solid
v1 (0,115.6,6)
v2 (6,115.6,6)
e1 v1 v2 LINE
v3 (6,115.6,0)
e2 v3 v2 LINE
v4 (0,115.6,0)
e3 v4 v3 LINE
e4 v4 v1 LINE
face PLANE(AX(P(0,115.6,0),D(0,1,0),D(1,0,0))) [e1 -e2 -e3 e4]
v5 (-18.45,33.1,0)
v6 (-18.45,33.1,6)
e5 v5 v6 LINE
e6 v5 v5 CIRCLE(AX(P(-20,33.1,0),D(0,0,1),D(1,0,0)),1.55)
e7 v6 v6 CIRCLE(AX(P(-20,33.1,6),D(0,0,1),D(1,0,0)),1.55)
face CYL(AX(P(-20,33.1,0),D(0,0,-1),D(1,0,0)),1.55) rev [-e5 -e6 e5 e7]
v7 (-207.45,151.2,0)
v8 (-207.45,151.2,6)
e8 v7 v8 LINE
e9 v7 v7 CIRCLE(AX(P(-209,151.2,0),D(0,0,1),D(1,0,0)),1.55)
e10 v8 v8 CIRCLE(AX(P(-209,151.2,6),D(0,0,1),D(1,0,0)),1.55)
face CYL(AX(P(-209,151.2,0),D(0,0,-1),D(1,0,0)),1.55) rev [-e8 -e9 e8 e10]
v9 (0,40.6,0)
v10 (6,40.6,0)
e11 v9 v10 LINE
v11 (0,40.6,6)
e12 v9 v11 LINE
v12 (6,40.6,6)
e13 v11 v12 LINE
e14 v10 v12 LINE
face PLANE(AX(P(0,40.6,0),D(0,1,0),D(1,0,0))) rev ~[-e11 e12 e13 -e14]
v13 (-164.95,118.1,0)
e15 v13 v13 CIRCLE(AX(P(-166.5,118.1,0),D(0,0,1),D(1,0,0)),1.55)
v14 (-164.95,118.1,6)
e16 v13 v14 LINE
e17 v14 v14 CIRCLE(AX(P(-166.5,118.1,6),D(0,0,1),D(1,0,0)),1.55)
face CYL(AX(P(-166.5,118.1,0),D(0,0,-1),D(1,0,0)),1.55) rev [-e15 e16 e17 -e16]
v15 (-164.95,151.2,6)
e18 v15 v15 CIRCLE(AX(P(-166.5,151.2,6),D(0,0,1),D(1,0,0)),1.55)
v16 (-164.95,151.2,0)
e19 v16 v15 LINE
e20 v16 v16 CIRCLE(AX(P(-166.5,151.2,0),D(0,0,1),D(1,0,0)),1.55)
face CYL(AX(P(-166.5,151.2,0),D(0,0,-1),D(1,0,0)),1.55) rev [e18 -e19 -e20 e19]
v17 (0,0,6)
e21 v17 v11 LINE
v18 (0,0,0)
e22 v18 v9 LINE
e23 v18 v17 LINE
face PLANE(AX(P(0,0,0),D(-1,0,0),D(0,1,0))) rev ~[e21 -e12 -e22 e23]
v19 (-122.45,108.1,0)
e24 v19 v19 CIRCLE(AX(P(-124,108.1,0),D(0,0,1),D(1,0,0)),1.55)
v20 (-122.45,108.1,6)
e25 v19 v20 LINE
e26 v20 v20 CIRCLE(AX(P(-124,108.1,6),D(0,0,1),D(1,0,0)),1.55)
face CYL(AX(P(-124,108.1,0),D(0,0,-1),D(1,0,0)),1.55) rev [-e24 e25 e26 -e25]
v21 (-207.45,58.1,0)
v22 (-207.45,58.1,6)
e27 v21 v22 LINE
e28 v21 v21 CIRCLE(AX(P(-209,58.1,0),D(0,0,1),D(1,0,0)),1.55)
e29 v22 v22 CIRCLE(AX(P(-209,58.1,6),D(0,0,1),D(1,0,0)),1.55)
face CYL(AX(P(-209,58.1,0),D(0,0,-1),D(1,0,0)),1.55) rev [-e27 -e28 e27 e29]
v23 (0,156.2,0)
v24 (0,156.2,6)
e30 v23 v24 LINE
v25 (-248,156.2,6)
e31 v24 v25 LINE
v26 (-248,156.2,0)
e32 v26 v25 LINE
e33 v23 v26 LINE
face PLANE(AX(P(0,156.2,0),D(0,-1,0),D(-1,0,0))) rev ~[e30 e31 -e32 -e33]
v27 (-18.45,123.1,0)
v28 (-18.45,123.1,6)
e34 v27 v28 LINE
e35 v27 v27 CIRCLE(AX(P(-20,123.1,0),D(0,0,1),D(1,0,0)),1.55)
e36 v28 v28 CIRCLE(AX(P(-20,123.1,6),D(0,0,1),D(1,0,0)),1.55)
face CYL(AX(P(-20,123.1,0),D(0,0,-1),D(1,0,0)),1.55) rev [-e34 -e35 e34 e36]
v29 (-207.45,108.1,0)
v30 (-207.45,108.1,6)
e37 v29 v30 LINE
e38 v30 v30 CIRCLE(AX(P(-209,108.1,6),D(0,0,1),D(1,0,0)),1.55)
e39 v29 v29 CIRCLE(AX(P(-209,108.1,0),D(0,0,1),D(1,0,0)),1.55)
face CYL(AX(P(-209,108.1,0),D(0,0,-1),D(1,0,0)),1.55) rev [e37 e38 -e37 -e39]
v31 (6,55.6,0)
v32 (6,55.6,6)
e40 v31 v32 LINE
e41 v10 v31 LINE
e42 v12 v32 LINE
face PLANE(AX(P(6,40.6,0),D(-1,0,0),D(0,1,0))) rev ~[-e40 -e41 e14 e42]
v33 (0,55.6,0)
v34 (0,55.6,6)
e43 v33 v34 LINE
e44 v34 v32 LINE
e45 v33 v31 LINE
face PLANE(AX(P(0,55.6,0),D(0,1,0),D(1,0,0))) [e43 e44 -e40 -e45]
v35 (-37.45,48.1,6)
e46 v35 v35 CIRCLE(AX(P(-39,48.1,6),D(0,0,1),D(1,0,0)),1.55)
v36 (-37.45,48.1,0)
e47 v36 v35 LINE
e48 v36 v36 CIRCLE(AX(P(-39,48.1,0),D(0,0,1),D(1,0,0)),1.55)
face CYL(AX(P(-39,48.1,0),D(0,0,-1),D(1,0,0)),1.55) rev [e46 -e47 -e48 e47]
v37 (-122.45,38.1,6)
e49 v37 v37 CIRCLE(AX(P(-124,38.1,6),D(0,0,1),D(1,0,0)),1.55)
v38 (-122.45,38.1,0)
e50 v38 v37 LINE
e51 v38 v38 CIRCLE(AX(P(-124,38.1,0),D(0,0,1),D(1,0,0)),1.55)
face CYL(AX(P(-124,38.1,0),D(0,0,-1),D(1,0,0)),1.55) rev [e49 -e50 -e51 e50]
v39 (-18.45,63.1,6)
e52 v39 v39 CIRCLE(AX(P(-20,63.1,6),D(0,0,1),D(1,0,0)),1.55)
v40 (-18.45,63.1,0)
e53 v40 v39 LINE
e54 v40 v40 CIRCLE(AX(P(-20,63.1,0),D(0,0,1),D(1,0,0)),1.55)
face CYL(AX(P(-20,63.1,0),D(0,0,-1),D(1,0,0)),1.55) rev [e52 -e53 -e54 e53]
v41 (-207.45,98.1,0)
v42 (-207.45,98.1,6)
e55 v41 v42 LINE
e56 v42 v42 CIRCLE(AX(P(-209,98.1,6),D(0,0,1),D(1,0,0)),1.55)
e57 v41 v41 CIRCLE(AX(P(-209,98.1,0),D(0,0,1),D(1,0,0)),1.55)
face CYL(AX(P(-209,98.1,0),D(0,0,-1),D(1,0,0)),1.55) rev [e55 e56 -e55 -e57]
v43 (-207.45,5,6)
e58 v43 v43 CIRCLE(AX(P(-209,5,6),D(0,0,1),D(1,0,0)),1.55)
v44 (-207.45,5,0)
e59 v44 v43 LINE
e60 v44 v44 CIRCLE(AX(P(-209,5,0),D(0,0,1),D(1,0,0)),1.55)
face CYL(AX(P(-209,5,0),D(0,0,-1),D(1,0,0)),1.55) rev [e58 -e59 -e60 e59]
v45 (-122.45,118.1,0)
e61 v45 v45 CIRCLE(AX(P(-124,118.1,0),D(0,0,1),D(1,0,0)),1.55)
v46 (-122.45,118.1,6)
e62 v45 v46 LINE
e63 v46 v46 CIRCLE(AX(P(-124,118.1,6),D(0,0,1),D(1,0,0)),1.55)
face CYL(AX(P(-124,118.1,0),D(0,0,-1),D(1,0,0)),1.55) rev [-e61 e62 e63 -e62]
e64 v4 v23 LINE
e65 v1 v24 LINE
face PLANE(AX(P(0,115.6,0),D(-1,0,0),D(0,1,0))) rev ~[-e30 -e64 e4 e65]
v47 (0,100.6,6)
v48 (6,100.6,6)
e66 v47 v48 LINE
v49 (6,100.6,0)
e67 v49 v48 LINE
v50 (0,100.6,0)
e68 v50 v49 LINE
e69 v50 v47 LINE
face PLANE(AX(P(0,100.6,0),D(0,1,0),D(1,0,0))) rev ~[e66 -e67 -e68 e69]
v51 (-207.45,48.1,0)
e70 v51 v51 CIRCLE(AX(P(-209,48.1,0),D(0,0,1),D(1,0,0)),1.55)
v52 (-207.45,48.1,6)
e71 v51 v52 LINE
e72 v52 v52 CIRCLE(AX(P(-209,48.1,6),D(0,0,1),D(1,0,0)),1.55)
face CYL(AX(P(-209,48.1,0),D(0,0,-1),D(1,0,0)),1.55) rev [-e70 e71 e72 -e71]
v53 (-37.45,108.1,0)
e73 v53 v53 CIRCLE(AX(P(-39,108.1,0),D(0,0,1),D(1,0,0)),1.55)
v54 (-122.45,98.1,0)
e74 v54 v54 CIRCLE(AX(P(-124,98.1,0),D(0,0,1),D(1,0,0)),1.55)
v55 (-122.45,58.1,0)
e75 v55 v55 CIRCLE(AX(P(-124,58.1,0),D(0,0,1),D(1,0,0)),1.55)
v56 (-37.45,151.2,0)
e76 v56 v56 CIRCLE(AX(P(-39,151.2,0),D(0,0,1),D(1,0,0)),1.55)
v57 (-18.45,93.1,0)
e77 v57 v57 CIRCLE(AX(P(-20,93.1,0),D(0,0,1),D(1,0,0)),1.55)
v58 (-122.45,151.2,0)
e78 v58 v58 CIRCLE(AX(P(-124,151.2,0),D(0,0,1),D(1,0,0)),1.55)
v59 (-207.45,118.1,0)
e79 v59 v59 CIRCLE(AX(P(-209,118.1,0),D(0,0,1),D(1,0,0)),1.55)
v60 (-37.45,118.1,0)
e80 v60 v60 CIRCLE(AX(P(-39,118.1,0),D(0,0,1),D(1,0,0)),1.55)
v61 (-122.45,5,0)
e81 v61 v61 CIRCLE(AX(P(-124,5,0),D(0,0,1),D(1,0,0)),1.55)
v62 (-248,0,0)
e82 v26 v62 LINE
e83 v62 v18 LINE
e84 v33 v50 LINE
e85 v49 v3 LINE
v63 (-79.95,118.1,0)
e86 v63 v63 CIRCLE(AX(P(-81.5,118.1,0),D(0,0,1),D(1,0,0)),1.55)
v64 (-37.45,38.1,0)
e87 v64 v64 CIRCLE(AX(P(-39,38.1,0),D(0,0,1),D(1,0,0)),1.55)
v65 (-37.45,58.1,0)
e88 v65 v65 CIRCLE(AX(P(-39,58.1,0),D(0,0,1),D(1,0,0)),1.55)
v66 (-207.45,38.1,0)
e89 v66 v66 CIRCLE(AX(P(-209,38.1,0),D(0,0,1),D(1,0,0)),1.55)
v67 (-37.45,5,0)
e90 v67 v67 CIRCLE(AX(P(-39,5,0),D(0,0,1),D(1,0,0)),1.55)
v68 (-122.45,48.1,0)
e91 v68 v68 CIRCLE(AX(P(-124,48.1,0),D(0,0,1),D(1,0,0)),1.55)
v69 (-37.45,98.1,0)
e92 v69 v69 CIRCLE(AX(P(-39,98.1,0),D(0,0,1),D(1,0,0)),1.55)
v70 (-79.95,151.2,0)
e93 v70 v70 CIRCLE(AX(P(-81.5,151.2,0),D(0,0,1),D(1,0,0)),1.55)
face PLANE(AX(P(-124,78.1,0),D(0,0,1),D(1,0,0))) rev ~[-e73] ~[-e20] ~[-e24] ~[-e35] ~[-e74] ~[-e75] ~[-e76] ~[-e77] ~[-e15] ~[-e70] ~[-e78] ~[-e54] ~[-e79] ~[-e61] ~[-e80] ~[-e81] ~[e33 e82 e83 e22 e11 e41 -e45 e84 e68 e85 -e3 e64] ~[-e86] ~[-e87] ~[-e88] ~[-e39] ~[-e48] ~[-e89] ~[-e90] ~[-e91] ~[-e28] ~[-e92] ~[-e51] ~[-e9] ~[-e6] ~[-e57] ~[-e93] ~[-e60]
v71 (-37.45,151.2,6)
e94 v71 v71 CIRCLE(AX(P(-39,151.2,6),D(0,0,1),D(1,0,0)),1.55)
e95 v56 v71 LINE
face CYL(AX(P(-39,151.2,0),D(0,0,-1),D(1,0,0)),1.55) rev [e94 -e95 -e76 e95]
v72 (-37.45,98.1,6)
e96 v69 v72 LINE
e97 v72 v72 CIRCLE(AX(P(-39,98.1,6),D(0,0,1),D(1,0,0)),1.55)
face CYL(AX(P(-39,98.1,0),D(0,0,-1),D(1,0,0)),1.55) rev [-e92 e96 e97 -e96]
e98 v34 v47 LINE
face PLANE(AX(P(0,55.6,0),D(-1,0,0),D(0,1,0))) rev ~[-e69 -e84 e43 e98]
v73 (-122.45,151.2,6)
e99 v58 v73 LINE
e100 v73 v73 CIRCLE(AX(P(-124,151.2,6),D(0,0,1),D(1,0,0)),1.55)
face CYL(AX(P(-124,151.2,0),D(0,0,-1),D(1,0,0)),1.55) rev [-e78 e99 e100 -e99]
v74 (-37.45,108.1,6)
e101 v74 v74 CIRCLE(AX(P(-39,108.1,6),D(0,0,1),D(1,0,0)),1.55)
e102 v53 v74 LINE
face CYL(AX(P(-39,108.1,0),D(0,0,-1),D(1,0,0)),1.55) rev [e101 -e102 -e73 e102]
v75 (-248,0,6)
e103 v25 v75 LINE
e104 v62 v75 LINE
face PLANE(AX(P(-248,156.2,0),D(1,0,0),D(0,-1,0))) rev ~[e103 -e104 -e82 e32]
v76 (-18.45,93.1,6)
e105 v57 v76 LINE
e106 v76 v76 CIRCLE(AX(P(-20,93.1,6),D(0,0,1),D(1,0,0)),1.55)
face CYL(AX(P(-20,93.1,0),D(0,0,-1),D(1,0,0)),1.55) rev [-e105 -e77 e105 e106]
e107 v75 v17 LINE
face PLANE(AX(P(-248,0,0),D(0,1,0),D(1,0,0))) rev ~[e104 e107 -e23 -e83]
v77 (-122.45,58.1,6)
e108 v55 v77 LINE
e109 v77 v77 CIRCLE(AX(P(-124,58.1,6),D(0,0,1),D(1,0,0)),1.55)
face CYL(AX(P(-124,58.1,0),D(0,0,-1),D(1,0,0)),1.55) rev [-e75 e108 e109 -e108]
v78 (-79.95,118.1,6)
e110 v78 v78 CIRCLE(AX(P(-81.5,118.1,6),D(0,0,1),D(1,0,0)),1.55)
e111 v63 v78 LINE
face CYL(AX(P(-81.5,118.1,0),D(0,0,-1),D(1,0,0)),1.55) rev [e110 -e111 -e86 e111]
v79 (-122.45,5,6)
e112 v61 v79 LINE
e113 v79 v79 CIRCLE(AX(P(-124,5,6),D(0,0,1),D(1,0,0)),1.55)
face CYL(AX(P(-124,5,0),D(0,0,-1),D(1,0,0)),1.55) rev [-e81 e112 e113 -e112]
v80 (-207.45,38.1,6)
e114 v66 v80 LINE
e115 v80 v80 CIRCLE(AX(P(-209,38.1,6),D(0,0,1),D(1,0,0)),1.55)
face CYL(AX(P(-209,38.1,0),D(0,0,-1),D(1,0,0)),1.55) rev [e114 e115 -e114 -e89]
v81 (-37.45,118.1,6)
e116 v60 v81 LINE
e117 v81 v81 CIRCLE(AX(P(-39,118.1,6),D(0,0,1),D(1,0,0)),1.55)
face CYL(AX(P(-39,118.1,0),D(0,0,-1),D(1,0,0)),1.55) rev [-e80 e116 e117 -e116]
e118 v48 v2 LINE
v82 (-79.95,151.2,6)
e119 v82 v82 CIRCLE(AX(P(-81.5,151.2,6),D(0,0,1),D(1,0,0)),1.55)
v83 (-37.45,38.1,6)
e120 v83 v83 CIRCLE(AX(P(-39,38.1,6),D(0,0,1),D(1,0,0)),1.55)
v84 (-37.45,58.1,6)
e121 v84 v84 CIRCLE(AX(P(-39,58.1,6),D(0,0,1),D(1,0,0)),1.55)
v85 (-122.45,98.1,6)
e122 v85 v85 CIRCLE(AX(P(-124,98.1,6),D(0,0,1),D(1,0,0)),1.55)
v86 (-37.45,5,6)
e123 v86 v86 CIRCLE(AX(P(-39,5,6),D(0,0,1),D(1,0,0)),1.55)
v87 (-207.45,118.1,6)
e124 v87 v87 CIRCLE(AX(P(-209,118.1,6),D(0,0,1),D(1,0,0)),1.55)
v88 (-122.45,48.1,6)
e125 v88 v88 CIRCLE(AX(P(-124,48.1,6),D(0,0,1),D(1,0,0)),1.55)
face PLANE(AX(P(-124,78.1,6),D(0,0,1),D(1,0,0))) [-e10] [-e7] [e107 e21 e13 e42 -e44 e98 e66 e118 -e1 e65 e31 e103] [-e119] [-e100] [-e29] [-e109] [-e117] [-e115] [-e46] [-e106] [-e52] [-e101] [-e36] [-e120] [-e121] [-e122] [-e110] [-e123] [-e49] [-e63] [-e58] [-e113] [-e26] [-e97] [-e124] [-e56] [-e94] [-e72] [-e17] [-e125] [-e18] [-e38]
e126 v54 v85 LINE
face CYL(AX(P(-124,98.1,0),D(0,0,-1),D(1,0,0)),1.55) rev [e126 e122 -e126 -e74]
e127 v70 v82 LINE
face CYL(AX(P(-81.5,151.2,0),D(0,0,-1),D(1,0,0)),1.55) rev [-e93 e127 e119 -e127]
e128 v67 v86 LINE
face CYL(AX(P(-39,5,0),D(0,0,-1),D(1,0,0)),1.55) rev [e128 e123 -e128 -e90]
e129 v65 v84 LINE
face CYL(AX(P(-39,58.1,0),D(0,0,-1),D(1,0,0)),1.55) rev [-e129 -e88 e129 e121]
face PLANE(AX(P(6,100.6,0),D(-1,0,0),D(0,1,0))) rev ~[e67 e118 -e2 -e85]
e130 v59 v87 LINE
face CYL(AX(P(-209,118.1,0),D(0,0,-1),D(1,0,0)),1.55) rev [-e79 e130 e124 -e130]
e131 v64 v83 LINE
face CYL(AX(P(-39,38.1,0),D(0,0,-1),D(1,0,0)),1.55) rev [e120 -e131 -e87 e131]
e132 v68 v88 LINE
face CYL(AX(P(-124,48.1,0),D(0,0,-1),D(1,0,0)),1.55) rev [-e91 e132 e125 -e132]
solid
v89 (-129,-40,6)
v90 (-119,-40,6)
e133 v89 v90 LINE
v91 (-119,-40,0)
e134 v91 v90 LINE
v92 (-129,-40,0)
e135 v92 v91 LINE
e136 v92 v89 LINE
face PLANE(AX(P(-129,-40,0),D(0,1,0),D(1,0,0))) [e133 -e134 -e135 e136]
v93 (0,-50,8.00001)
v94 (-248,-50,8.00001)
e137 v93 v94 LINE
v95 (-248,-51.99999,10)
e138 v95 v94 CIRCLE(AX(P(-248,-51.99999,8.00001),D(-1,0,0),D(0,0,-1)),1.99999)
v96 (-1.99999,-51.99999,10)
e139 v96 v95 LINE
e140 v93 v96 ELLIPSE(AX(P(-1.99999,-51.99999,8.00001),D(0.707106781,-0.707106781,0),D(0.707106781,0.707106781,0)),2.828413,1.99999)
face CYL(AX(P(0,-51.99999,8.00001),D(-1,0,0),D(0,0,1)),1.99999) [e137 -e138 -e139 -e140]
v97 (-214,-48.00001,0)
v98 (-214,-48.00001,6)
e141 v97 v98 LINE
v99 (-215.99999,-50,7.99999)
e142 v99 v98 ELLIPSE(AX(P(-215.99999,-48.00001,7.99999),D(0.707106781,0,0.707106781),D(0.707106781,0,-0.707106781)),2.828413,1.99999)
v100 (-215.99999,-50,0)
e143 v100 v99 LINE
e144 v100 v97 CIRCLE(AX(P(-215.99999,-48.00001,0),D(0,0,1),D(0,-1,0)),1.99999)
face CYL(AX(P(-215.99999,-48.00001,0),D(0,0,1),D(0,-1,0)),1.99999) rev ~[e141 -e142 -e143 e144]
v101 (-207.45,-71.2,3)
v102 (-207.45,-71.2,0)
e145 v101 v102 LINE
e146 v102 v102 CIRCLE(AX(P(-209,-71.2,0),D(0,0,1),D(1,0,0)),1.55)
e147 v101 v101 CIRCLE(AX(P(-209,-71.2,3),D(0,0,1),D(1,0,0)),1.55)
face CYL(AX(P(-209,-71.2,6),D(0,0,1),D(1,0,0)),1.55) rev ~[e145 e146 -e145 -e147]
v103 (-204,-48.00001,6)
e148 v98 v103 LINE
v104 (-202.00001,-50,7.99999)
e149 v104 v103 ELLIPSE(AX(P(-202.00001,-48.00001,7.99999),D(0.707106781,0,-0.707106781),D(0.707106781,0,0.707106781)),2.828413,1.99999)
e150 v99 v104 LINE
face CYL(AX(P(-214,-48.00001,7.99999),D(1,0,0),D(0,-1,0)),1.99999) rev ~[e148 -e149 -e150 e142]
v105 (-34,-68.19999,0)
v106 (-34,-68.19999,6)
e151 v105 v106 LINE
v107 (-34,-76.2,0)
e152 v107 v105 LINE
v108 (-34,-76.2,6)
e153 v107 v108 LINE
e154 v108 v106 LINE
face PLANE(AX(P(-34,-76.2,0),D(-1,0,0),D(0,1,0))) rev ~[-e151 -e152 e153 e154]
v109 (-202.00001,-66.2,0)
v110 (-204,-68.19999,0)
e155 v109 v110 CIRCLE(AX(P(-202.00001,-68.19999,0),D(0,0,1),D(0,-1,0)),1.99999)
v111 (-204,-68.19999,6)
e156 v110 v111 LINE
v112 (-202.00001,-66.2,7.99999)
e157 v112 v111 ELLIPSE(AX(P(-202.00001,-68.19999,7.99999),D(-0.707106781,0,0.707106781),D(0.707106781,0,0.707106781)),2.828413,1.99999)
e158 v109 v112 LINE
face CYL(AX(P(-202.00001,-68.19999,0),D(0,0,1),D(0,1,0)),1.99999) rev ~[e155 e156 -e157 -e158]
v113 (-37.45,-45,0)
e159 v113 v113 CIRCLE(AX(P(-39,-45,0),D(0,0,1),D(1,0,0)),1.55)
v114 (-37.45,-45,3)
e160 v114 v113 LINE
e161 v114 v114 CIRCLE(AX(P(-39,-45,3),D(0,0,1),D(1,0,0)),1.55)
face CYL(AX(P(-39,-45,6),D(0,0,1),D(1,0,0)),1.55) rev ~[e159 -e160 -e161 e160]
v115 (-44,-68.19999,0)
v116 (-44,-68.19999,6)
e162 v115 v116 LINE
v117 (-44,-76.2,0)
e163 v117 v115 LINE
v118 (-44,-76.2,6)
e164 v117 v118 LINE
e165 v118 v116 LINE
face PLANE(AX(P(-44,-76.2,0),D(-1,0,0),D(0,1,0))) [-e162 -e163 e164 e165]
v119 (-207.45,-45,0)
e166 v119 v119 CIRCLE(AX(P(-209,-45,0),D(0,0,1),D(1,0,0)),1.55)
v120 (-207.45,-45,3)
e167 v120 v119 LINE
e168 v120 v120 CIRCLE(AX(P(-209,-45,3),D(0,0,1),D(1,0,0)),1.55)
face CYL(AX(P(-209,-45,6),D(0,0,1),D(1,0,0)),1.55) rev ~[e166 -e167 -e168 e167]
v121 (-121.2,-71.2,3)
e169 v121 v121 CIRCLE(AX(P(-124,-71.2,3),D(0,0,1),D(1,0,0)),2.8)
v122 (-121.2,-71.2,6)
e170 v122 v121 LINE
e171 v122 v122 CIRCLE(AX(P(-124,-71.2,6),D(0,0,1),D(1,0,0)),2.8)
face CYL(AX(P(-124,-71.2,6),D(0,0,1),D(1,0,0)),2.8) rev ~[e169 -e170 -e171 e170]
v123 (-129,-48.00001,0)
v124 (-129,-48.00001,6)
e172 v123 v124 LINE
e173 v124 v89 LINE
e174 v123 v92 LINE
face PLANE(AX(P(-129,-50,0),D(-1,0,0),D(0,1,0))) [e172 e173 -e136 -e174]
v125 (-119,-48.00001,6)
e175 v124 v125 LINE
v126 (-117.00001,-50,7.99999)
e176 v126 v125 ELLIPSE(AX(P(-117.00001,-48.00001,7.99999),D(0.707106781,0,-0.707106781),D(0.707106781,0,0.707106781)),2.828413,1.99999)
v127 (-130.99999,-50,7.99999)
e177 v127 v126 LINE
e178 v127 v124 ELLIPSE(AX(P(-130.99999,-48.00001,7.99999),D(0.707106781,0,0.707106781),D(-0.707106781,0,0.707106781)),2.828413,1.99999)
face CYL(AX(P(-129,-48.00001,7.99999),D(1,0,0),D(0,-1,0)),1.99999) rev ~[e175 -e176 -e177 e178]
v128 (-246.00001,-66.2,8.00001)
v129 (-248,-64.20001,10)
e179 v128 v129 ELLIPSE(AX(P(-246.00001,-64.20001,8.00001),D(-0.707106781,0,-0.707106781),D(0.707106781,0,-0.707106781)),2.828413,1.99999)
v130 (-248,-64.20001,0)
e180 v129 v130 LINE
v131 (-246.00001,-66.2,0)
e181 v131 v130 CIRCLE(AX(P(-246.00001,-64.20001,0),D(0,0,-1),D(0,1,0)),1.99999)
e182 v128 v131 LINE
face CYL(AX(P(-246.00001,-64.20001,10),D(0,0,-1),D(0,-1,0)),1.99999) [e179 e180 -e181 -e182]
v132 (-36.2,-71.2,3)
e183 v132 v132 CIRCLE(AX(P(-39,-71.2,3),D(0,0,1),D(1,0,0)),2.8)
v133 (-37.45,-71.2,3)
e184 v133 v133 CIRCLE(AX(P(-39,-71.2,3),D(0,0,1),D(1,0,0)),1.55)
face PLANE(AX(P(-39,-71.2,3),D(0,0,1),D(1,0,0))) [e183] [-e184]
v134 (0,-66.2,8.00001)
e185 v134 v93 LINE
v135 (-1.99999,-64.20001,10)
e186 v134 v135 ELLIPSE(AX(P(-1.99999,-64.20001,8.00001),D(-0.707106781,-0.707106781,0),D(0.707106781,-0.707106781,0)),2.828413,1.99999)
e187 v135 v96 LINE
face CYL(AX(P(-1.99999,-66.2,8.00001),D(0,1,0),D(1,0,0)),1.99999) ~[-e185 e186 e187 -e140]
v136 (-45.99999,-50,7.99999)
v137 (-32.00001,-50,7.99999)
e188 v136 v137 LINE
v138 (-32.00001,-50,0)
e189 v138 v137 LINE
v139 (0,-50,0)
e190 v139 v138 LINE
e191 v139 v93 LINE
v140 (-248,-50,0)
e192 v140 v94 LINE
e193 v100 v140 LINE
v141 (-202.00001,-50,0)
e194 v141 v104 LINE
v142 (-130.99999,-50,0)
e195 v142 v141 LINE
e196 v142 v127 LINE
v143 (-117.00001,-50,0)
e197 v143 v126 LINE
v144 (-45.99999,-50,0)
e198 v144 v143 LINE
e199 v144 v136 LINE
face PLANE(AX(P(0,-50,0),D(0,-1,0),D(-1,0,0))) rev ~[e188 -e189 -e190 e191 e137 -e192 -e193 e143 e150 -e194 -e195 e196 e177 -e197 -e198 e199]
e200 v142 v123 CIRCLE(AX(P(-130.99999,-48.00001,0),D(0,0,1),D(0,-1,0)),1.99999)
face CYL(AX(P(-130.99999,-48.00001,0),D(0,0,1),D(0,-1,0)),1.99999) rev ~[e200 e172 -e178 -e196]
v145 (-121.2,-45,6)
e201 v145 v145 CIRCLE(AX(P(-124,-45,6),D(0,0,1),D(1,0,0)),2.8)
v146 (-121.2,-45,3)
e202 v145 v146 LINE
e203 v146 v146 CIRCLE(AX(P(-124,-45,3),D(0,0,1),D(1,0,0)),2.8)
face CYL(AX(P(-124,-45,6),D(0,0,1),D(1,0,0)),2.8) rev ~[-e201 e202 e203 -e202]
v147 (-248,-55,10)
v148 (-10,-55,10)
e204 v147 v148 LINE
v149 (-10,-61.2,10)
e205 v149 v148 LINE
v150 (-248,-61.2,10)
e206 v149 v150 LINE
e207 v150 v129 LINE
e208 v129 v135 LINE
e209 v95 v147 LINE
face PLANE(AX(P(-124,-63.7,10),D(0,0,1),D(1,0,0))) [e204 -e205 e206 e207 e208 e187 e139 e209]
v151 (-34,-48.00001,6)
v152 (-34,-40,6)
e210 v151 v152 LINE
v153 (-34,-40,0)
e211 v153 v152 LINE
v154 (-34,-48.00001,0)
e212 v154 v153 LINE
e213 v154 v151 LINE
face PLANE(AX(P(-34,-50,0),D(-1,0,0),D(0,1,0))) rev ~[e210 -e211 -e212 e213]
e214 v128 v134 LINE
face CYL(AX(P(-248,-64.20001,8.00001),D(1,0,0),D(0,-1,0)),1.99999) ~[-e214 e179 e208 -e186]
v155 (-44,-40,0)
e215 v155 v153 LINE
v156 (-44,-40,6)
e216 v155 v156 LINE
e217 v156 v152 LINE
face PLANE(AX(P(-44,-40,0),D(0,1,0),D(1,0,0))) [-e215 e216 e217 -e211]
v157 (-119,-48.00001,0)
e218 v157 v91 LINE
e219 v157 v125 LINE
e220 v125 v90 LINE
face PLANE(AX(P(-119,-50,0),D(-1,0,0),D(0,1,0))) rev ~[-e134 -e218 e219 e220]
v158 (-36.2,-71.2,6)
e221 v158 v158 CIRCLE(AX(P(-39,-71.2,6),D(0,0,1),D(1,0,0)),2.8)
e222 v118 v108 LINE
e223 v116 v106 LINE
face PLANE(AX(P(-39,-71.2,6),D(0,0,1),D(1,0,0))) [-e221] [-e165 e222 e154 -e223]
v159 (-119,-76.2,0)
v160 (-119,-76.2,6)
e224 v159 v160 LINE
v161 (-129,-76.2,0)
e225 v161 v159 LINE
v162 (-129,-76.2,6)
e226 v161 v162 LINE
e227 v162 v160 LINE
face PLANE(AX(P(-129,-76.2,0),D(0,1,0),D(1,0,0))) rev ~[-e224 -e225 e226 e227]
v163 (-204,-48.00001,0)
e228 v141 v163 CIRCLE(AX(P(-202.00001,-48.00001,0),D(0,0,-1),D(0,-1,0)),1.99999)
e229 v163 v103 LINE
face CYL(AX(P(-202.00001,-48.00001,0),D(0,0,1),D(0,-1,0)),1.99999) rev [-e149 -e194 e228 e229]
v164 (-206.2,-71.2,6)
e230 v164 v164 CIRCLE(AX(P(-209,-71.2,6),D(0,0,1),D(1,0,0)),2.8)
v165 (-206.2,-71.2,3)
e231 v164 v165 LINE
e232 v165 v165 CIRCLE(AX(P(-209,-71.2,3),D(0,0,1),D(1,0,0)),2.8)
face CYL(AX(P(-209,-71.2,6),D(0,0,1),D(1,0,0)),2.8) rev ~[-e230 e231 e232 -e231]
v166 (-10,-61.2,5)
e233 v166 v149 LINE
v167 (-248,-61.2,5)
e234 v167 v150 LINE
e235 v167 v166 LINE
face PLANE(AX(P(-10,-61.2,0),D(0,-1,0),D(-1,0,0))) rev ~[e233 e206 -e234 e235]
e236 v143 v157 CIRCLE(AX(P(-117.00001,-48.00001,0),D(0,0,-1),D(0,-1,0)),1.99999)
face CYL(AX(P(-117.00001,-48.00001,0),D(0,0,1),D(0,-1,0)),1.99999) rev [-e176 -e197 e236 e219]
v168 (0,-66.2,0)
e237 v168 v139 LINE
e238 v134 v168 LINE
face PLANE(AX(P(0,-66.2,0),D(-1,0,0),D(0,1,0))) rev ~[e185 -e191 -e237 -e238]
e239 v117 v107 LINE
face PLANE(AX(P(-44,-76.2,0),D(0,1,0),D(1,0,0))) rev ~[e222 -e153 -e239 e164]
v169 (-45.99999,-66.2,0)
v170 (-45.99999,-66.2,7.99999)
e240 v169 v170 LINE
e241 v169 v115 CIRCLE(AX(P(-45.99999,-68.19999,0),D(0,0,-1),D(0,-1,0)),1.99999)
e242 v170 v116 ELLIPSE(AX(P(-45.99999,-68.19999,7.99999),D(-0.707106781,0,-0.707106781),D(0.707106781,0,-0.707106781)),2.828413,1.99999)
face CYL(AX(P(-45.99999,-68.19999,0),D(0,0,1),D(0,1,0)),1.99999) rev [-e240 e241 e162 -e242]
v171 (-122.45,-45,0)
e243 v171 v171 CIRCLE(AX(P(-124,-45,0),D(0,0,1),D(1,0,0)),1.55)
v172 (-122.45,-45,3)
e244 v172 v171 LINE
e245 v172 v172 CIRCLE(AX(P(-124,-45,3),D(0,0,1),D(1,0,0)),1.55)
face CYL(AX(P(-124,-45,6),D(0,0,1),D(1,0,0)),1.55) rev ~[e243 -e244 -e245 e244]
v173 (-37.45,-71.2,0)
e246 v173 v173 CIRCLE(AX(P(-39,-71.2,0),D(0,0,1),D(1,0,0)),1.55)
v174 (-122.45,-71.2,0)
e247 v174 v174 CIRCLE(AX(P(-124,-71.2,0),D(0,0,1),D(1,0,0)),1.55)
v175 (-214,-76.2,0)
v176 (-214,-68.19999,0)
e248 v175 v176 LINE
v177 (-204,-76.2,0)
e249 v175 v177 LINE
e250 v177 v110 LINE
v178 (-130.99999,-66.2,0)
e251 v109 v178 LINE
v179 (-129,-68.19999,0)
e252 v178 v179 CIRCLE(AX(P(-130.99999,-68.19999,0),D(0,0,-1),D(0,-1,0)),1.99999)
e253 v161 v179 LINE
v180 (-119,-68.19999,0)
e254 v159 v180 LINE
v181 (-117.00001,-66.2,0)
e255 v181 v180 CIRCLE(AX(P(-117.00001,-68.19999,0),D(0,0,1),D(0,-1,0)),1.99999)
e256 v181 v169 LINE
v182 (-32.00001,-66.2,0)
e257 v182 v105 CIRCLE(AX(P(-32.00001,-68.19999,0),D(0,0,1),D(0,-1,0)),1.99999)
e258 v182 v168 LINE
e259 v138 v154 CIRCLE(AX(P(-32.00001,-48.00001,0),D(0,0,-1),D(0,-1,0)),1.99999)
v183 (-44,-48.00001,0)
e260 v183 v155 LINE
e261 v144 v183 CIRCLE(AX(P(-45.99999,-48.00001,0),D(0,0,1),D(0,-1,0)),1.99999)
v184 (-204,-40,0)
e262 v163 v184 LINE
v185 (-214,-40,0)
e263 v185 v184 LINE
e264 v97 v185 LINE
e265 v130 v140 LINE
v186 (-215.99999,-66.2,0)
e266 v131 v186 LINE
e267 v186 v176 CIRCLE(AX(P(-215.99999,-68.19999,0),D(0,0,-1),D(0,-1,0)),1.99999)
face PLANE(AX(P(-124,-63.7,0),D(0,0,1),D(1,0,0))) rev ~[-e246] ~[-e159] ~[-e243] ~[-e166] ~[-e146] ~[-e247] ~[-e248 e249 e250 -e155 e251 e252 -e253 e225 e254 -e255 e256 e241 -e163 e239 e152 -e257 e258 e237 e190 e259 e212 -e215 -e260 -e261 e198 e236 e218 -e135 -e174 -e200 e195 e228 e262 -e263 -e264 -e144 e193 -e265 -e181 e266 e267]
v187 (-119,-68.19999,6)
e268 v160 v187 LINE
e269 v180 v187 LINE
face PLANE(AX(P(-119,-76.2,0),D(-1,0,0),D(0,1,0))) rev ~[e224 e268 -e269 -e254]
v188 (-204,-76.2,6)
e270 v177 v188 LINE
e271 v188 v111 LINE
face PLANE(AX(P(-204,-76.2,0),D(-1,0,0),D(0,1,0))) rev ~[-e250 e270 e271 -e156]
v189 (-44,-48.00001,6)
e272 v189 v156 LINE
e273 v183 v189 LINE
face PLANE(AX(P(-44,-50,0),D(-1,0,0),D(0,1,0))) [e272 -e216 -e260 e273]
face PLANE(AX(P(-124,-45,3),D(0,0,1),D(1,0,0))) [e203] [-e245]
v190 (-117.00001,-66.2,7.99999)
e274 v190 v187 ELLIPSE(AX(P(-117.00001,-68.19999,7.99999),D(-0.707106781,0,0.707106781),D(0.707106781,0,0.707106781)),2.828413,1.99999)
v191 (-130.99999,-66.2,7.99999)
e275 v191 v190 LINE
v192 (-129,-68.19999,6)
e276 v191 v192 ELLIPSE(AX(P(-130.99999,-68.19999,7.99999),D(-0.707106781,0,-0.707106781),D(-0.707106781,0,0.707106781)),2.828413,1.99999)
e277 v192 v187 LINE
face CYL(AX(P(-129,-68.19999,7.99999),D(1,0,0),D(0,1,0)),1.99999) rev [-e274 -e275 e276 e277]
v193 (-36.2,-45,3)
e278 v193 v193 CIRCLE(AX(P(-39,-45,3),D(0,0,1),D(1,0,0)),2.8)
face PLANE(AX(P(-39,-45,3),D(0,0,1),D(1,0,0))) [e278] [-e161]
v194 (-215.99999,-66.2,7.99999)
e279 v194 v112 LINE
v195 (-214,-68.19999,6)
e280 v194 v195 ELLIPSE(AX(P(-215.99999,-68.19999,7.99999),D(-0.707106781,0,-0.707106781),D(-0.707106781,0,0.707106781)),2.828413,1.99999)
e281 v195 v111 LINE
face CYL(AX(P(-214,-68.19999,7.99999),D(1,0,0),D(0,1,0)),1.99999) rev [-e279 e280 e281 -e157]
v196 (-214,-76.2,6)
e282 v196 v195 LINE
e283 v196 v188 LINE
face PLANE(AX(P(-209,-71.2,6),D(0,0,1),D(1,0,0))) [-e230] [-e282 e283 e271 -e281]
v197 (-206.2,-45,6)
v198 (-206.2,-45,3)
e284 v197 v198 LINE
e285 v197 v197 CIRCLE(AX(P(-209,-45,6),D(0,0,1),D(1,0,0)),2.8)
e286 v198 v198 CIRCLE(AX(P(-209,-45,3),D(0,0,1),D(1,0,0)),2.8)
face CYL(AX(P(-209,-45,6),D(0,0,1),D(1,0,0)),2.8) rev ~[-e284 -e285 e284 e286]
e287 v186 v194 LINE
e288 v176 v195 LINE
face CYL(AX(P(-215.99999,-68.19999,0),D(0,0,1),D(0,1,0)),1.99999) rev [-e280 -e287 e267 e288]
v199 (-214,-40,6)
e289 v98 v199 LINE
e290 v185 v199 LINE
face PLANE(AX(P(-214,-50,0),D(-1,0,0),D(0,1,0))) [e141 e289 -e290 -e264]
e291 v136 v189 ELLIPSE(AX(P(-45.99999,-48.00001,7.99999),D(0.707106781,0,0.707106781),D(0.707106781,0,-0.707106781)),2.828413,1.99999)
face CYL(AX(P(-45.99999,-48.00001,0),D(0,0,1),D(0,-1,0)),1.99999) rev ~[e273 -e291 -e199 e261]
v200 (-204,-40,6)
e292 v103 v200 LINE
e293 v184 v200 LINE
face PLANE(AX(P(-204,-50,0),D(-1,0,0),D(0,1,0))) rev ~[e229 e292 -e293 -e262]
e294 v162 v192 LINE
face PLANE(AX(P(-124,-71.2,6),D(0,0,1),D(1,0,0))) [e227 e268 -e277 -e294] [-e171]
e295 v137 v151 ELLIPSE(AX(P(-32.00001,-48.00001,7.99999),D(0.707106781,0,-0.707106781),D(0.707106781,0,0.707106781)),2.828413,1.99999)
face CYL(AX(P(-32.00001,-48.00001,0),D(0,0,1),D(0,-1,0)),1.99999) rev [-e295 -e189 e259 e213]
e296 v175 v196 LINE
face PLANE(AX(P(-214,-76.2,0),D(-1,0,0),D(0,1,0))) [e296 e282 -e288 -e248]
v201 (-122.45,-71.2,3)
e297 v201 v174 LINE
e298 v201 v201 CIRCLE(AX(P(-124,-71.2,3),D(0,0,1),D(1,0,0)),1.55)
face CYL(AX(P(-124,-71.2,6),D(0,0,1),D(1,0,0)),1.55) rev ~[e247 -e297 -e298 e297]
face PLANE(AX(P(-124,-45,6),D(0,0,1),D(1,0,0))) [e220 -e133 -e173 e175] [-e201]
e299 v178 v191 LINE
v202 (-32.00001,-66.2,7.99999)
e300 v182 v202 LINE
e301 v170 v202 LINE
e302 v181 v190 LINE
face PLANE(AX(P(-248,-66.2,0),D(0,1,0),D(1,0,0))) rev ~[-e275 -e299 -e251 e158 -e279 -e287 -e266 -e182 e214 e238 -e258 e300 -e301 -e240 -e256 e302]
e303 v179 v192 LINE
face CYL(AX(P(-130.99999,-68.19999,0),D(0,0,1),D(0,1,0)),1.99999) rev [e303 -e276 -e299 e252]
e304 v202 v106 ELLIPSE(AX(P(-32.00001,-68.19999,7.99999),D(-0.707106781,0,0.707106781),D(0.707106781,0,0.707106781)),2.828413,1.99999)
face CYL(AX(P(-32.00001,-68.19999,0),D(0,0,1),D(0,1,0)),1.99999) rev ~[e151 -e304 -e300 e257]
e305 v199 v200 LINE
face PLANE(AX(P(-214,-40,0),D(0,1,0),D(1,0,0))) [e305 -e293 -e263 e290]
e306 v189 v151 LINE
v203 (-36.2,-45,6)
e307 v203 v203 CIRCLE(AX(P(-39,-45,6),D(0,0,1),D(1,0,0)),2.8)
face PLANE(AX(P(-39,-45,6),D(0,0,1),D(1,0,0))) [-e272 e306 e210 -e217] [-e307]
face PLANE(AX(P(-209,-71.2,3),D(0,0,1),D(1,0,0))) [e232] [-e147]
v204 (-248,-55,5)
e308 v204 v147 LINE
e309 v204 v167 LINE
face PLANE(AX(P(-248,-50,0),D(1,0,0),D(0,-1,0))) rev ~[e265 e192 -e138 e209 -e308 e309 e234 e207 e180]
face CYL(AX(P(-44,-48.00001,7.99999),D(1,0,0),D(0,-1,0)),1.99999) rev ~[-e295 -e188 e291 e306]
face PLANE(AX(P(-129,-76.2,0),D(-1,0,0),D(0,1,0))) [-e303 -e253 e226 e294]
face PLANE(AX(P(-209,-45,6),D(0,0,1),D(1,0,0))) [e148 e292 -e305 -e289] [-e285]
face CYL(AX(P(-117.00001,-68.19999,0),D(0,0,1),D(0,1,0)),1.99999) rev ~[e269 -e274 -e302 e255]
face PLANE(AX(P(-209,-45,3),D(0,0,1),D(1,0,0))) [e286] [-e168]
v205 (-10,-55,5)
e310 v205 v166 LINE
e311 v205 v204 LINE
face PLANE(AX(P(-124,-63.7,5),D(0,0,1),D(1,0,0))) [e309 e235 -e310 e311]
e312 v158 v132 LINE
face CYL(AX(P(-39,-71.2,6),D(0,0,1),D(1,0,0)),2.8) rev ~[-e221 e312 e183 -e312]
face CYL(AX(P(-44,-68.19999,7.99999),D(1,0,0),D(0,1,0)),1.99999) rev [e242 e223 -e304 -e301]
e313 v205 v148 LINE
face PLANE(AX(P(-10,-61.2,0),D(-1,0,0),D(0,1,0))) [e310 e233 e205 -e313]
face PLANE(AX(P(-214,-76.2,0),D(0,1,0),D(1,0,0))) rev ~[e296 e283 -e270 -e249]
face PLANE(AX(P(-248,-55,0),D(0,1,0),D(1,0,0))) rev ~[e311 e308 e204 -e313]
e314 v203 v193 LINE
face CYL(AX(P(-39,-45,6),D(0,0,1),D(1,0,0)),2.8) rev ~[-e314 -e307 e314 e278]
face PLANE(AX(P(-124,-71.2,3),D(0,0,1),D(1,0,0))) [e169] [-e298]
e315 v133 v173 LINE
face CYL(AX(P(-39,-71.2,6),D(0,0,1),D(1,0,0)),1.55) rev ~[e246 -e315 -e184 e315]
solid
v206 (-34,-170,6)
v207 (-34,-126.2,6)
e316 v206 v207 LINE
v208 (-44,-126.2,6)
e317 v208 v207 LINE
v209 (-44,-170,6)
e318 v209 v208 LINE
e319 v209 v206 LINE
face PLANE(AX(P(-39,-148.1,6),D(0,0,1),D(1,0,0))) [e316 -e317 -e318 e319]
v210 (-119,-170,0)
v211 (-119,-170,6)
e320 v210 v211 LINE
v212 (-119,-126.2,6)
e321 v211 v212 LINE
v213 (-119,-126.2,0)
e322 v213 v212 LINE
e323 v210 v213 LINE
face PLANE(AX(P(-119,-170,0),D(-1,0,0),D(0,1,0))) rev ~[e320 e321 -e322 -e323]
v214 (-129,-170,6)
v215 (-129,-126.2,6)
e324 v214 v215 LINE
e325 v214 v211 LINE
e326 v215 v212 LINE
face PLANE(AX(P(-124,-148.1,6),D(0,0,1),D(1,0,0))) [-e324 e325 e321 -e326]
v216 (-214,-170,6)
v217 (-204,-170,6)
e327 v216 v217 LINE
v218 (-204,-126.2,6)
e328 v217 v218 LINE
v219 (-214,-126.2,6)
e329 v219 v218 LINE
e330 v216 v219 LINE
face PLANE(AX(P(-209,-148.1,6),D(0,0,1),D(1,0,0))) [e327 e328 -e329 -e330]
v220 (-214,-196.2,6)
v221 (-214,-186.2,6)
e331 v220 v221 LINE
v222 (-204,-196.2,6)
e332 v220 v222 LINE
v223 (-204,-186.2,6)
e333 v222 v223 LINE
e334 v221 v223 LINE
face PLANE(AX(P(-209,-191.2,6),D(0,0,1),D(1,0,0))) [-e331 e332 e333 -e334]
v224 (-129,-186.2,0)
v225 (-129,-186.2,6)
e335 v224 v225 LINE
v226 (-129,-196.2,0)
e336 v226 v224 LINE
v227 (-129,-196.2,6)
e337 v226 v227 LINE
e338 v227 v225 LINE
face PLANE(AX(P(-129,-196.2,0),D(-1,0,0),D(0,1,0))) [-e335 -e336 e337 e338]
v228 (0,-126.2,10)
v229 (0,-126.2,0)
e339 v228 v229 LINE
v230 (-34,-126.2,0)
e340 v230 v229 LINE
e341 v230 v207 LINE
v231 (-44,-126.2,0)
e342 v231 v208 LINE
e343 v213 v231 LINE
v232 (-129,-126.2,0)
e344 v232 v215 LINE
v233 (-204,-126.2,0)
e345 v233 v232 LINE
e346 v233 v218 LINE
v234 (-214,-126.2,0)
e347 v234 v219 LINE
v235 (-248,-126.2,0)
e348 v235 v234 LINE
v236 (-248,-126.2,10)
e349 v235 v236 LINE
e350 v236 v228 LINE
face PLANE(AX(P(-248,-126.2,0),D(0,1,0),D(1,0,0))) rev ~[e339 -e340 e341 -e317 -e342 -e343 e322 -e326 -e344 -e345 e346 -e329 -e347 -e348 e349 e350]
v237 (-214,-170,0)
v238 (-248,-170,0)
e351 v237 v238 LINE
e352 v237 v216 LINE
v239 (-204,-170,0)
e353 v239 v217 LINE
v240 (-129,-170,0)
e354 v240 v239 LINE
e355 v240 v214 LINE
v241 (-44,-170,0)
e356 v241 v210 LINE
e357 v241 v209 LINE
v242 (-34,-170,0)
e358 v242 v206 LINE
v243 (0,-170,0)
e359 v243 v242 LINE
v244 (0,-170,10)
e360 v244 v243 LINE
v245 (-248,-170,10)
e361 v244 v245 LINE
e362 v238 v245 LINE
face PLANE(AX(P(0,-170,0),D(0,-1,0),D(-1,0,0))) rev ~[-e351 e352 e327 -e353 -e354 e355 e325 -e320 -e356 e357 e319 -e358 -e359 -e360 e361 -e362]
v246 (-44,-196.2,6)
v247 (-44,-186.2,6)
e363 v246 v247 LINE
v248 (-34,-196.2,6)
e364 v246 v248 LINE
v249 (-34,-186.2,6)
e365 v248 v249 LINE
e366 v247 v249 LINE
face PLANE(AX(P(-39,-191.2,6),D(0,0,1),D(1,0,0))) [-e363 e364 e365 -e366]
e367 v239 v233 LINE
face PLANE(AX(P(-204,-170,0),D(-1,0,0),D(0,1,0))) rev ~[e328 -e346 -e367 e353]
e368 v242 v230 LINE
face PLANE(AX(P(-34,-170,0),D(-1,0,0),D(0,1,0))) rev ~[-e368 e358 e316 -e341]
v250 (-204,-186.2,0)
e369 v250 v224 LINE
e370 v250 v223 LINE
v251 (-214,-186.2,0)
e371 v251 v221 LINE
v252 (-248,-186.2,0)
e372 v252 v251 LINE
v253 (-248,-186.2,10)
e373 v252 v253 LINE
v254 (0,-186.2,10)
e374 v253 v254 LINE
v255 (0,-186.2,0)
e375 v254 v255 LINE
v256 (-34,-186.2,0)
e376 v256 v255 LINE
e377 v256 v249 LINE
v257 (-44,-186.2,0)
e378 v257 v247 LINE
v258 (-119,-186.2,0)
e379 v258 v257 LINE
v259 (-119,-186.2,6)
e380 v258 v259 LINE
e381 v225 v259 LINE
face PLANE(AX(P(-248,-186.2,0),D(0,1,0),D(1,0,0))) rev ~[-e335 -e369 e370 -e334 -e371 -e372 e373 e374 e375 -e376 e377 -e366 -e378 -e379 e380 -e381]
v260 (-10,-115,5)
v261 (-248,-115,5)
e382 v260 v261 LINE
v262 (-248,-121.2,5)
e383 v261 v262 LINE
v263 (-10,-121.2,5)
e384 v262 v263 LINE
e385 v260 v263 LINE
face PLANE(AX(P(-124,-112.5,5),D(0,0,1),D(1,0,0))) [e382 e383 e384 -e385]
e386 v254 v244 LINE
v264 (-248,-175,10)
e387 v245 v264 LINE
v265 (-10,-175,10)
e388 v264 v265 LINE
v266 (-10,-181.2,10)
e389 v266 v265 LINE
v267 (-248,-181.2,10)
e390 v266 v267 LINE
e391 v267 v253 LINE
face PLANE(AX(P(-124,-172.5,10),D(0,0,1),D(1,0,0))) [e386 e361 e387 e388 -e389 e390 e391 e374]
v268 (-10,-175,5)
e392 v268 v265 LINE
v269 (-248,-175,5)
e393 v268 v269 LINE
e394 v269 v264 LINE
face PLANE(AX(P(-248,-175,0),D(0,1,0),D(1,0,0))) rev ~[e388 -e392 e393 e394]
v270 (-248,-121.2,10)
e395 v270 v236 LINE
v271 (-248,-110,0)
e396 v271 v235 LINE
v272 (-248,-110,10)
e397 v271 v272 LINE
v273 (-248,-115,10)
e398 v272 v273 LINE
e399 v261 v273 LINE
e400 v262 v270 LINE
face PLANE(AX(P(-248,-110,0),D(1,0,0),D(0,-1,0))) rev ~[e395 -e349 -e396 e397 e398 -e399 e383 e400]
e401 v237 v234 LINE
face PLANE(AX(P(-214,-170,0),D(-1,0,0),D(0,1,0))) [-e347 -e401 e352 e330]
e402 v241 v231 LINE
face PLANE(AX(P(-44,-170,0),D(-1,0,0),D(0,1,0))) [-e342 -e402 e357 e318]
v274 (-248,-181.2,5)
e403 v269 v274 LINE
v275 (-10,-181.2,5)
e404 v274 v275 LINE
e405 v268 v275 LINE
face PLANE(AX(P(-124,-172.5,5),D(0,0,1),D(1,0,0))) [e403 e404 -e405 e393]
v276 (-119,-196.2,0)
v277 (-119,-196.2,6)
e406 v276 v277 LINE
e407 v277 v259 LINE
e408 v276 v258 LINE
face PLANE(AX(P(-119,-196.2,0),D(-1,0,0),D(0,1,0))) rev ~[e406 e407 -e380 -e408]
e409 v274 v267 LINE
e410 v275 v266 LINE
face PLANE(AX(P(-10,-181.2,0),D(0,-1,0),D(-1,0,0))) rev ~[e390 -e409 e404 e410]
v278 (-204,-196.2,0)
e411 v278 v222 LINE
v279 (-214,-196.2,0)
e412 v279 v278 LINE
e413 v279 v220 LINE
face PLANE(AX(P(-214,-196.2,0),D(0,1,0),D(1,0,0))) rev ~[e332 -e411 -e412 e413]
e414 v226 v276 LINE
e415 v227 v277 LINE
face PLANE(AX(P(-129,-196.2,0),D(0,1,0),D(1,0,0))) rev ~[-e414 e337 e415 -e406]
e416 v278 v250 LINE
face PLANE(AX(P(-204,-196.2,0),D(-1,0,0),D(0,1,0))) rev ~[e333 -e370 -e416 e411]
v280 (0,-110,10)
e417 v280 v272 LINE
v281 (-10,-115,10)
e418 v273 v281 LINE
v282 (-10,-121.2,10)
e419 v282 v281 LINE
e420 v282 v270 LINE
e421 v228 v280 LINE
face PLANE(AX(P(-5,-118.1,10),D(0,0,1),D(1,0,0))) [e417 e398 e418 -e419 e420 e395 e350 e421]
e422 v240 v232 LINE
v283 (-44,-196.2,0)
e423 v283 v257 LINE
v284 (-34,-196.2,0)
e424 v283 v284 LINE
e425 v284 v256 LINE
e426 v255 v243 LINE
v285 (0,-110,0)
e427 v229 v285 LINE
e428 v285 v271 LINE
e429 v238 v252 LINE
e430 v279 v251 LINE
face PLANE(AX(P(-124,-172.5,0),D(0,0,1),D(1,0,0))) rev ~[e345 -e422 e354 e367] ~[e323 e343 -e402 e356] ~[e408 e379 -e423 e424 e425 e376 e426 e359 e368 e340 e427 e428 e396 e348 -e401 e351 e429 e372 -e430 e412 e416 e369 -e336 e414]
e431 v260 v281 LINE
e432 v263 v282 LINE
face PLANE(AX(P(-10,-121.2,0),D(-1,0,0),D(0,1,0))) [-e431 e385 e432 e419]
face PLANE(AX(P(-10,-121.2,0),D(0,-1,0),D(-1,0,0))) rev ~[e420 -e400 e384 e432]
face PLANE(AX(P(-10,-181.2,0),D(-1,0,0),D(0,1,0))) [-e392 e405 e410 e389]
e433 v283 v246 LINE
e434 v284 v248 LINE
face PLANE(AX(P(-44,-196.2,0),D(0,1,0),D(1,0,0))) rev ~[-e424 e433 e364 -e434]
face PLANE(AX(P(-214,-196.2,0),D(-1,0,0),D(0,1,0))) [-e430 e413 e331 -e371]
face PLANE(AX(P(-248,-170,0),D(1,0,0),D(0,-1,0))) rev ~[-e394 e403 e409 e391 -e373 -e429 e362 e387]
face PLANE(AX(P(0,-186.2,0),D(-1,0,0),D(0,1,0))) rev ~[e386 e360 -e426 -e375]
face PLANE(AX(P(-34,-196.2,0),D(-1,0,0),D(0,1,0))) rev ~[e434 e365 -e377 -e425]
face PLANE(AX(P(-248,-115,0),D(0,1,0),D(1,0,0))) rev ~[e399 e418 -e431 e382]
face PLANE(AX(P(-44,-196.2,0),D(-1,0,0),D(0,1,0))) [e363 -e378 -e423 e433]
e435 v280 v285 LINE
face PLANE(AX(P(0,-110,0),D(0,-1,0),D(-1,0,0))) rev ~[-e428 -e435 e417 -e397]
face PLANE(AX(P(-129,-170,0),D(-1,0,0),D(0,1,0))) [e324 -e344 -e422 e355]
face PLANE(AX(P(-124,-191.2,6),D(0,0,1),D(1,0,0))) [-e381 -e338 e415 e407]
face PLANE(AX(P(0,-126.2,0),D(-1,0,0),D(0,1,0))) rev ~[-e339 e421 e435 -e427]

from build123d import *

# Parameters (mm, degrees)
F0_R          = 1.55
F0_W          = 6
F0_H          = 15
F1_DEPTH      = 6
F0_W_2        = 238
F0_H_2        = 6.2
F0_W_3        = 10
F2_DEPTH      = 5
F3_DEPTH      = 10
F0_H_3        = 43.8
F0_H_4        = 10
F4_DEPTH      = 6
F5_R          = 1.55
F6_DEPTH      = 20
F6_DEPTH_BACK = 25
F5_R_2        = 2.8
F7_DEPTH      = 3
F7_DEPTH_BACK = 25
F8_R          = 1.99999


# Not quite as in the source:
# - a fillet or chamfer is up to 0.001 mm smaller than in the source, because OpenCascade refuses the exact size
# - a feature names something its author has since deleted; it is built from what else it names


with BuildPart() as f1:
    # F0 (on Top) → F1 (new body)
    with BuildSketch(Plane.XY):
        Polygon((-248, 0), (0, 0), (0, 40.6), (0, 55.6), (0, 100.6), (0, 115.6), (0, 156.2), (-248, 156.2), align=None)
        with Locations((-209, 5)):
            Circle(F0_R, mode=Mode.SUBTRACT)
        with Locations((-209, 38.1)):
            Circle(F0_R, mode=Mode.SUBTRACT)
        with Locations((-209, 48.1)):
            Circle(F0_R, mode=Mode.SUBTRACT)
        with Locations((-209, 58.1)):
            Circle(F0_R, mode=Mode.SUBTRACT)
        with Locations((-209, 98.1)):
            Circle(F0_R, mode=Mode.SUBTRACT)
        with Locations((-209, 108.1)):
            Circle(F0_R, mode=Mode.SUBTRACT)
        with Locations((-209, 118.1)):
            Circle(F0_R, mode=Mode.SUBTRACT)
        with Locations((-209, 151.2)):
            Circle(F0_R, mode=Mode.SUBTRACT)
        with Locations((-124, 5)):
            Circle(F0_R, mode=Mode.SUBTRACT)
        with Locations((-124, 38.1)):
            Circle(F0_R, mode=Mode.SUBTRACT)
        with Locations((-124, 48.1)):
            Circle(F0_R, mode=Mode.SUBTRACT)
        with Locations((-124, 58.1)):
            Circle(F0_R, mode=Mode.SUBTRACT)
        with Locations((-166.5, 118.1)):
            Circle(F0_R, mode=Mode.SUBTRACT)
        with Locations((-166.5, 151.2)):
            Circle(F0_R, mode=Mode.SUBTRACT)
        with Locations((-124, 98.1)):
            Circle(F0_R, mode=Mode.SUBTRACT)
        with Locations((-124, 108.1)):
            Circle(F0_R, mode=Mode.SUBTRACT)
        with Locations((-124, 118.1)):
            Circle(F0_R, mode=Mode.SUBTRACT)
        with Locations((-124, 151.2)):
            Circle(F0_R, mode=Mode.SUBTRACT)
        with Locations((-81.5, 118.1)):
            Circle(F0_R, mode=Mode.SUBTRACT)
        with Locations((-81.5, 151.2)):
            Circle(F0_R, mode=Mode.SUBTRACT)
        with Locations((-39, 5)):
            Circle(F0_R, mode=Mode.SUBTRACT)
        with Locations((-39, 38.1)):
            Circle(F0_R, mode=Mode.SUBTRACT)
        with Locations((-39, 48.1)):
            Circle(F0_R, mode=Mode.SUBTRACT)
        with Locations((-39, 58.1)):
            Circle(F0_R, mode=Mode.SUBTRACT)
        with Locations((-20, 33.1)):
            Circle(F0_R, mode=Mode.SUBTRACT)
        with Locations((-20, 63.1)):
            Circle(F0_R, mode=Mode.SUBTRACT)
        with Locations((-39, 98.1)):
            Circle(F0_R, mode=Mode.SUBTRACT)
        with Locations((-39, 108.1)):
            Circle(F0_R, mode=Mode.SUBTRACT)
        with Locations((-39, 118.1)):
            Circle(F0_R, mode=Mode.SUBTRACT)
        with Locations((-39, 151.2)):
            Circle(F0_R, mode=Mode.SUBTRACT)
        with Locations((-20, 93.1)):
            Circle(F0_R, mode=Mode.SUBTRACT)
        with Locations((-20, 123.1)):
            Circle(F0_R, mode=Mode.SUBTRACT)
        with Locations((3, 108.1)):
            Rectangle(F0_W, F0_H)
        with Locations((3, 48.1)):
            Rectangle(F0_W, F0_H)
    extrude(amount=F1_DEPTH)


with BuildPart() as f2:
    # F0 (on Top) → F2 (new body)
    with BuildSketch(Plane.XY):
        Polygon((0, -66.2), (0, -61.2), (-10, -61.2), (-248, -61.2), (-248, -66.2), (-214, -66.2), (-204, -66.2), (-129, -66.2), (-119, -66.2), (-44, -66.2), (-34, -66.2), align=None)
        with Locations((-129, -58.1)):
            Rectangle(F0_W_2, F0_H_2)
        Polygon((0, -55), (0, -50), (-34, -50), (-44, -50), (-119, -50), (-129, -50), (-204, -50), (-214, -50), (-248, -50), (-248, -55), (-10, -55), align=None)
        with Locations((-5, -58.1)):
            Rectangle(F0_W_3, F0_H_2)
    extrude(amount=F2_DEPTH)

    # F0 (on Top) → F3, piece 2 (join)
    with BuildSketch(Plane.XY):
        Polygon((0, -66.2), (0, -61.2), (-10, -61.2), (-248, -61.2), (-248, -66.2), (-214, -66.2), (-204, -66.2), (-129, -66.2), (-119, -66.2), (-44, -66.2), (-34, -66.2), align=None)
        Polygon((0, -55), (0, -50), (-34, -50), (-44, -50), (-119, -50), (-129, -50), (-204, -50), (-214, -50), (-248, -50), (-248, -55), (-10, -55), align=None)
        with Locations((-5, -58.1)):
            Rectangle(F0_W_3, F0_H_2)
    extrude(amount=F3_DEPTH)

    # F0 (on Top) → F4, piece 2 (join)
    with BuildSketch(Plane.XY):
        with Locations((-209, -45)):
            Rectangle(F0_W_3, F0_H_4)
        with Locations((-124, -45)):
            Rectangle(F0_W_3, F0_H_4)
        with Locations((-39, -45)):
            Rectangle(F0_W_3, F0_H_4)
        with Locations((-39, -71.2)):
            Rectangle(F0_W_3, F0_H_4)
        with Locations((-124, -71.2)):
            Rectangle(F0_W_3, F0_H_4)
        with Locations((-209, -71.2)):
            Rectangle(F0_W_3, F0_H_4)
    extrude(amount=F4_DEPTH)

    # F5 (on face) → F6 (cut, two sides)
    with BuildSketch(Plane.XY.offset(6)) as f6_sk:
        with Locations((-209, -71.2)):
            Circle(F5_R)
        with Locations((-124, -71.2)):
            Circle(F5_R)
        with Locations((-39, -71.2)):
            Circle(F5_R)
        with Locations((-39, -131.2)):
            Circle(F5_R)
        with Locations((-124, -131.2)):
            Circle(F5_R)
        with Locations((-209, -131.2)):
            Circle(F5_R)
        with Locations((-209, -45)):
            Circle(F5_R)
        with Locations((-124, -45)):
            Circle(F5_R)
        with Locations((-39, -45)):
            Circle(F5_R)
    extrude(amount=-F6_DEPTH, mode=Mode.SUBTRACT)
    extrude(f6_sk.sketch, amount=F6_DEPTH_BACK, mode=Mode.SUBTRACT)

    # F5 (on face) → F7 (cut, two sides)
    with BuildSketch(Plane.XY.offset(6)) as f7_sk:
        with Locations((-209, -71.2)):
            Circle(F5_R_2)
        with Locations((-209, -71.2)):
            Circle(F5_R, mode=Mode.SUBTRACT)
        with Locations((-124, -71.2)):
            Circle(F5_R_2)
        with Locations((-124, -71.2)):
            Circle(F5_R, mode=Mode.SUBTRACT)
        with Locations((-39, -71.2)):
            Circle(F5_R_2)
        with Locations((-39, -71.2)):
            Circle(F5_R, mode=Mode.SUBTRACT)
        with Locations((-209, -131.2)):
            Circle(F5_R_2)
        with Locations((-209, -131.2)):
            Circle(F5_R, mode=Mode.SUBTRACT)
        with Locations((-124, -131.2)):
            Circle(F5_R_2)
        with Locations((-124, -131.2)):
            Circle(F5_R, mode=Mode.SUBTRACT)
        with Locations((-39, -131.2)):
            Circle(F5_R_2)
        with Locations((-39, -131.2)):
            Circle(F5_R, mode=Mode.SUBTRACT)
        with Locations((-209, -45)):
            Circle(F5_R_2)
        with Locations((-209, -45)):
            Circle(F5_R, mode=Mode.SUBTRACT)
        with Locations((-124, -45)):
            Circle(F5_R_2)
        with Locations((-124, -45)):
            Circle(F5_R, mode=Mode.SUBTRACT)
        with Locations((-39, -45)):
            Circle(F5_R_2)
        with Locations((-39, -45)):
            Circle(F5_R, mode=Mode.SUBTRACT)
    extrude(amount=-F7_DEPTH, mode=Mode.SUBTRACT)
    extrude(f7_sk.sketch, amount=F7_DEPTH_BACK, mode=Mode.SUBTRACT)

    # F8 (radius 2 in the source; OpenCascade refuses exactly that, so slightly less here)
    f8_edges = [f2.edges().sort_by_distance(p)[0] for p in [
        (-214, -66.2, 3),
        (-204, -66.2, 3),
        (-248, -66.2, 5),
        (-124, -66.2, 10),
        (-119, -66.2, 3),
        (-129, -66.2, 3),
        (0, -58.1, 10),
        (-124, -50, 10),
        (-39, -66.2, 6),
        (-44, -66.2, 3),
        (-34, -66.2, 3),
        (-34, -50, 3),
        (-39, -50, 6),
        (-44, -50, 3),
        (-124, -66.2, 6),
        (-209, -66.2, 6),
        (-209, -50, 6),
        (-204, -50, 3),
        (-214, -50, 3),
        (-129, -50, 3),
        (-124, -50, 6),
        (-119, -50, 3),
    ]]
    fillet(f8_edges, radius=F8_R)


with BuildPart() as f2b:
    # F0 (on Top) → F2, piece 2 (new body)
    with BuildSketch(Plane.XY):
        Polygon((0, -110), (-34, -110), (-44, -110), (-119, -110), (-129, -110), (-204, -110), (-214, -110), (-248, -110), (-248, -115), (-10, -115), (0, -115), align=None)
        with Locations((-129, -118.1)):
            Rectangle(F0_W_2, F0_H_2)
        Polygon((0, -126.2), (0, -121.2), (-10, -121.2), (-248, -121.2), (-248, -126.2), (-214, -126.2), (-204, -126.2), (-129, -126.2), (-119, -126.2), (-44, -126.2), (-34, -126.2), align=None)
        with Locations((-5, -118.1)):
            Rectangle(F0_W_3, F0_H_2)
    extrude(amount=F2_DEPTH)

    # F0 (on Top) → F3 (join)
    with BuildSketch(Plane.XY):
        with Locations((-5, -118.1)):
            Rectangle(F0_W_3, F0_H_2)
        Polygon((0, -110), (-34, -110), (-44, -110), (-119, -110), (-129, -110), (-204, -110), (-214, -110), (-248, -110), (-248, -115), (-10, -115), (0, -115), align=None)
        Polygon((0, -126.2), (0, -121.2), (-10, -121.2), (-248, -121.2), (-248, -126.2), (-214, -126.2), (-204, -126.2), (-129, -126.2), (-119, -126.2), (-44, -126.2), (-34, -126.2), align=None)
    extrude(amount=F3_DEPTH)



with BuildPart() as f2c:
    # F0 (on Top) → F2, piece 3 (new body)
    with BuildSketch(Plane.XY):
        Polygon((0, -170), (-34, -170), (-44, -170), (-119, -170), (-129, -170), (-204, -170), (-214, -170), (-248, -170), (-248, -175), (-10, -175), (0, -175), align=None)
        with Locations((-129, -178.1)):
            Rectangle(F0_W_2, F0_H_2)
        Polygon((0, -186.2), (0, -181.2), (-10, -181.2), (-248, -181.2), (-248, -186.2), (-214, -186.2), (-204, -186.2), (-129, -186.2), (-119, -186.2), (-44, -186.2), (-34, -186.2), align=None)
        with Locations((-5, -178.1)):
            Rectangle(F0_W_3, F0_H_2)
    extrude(amount=F2_DEPTH)

    # F0 (on Top) → F3, piece 3 (join)
    with BuildSketch(Plane.XY):
        Polygon((0, -170), (-34, -170), (-44, -170), (-119, -170), (-129, -170), (-204, -170), (-214, -170), (-248, -170), (-248, -175), (-10, -175), (0, -175), align=None)
        with Locations((-5, -178.1)):
            Rectangle(F0_W_3, F0_H_2)
        Polygon((0, -186.2), (0, -181.2), (-10, -181.2), (-248, -181.2), (-248, -186.2), (-214, -186.2), (-204, -186.2), (-129, -186.2), (-119, -186.2), (-44, -186.2), (-34, -186.2), align=None)
    extrude(amount=F3_DEPTH)


with BuildPart() as f2b_1:
    add(f2b.part)

    add(f2c.part)  # F4 merges F2c
    # F0 (on Top) → F4 (join)
    with BuildSketch(Plane.XY):
        with Locations((-39, -148.1)):
            Rectangle(F0_W_3, F0_H_3)
        with Locations((-124, -148.1)):
            Rectangle(F0_W_3, F0_H_3)
        with Locations((-209, -148.1)):
            Rectangle(F0_W_3, F0_H_3)
        with Locations((-209, -191.2)):
            Rectangle(F0_W_3, F0_H_4)
        with Locations((-124, -191.2)):
            Rectangle(F0_W_3, F0_H_4)
        with Locations((-39, -191.2)):
            Rectangle(F0_W_3, F0_H_4)
    extrude(amount=F4_DEPTH)


solid = Compound([f1.part, f2.part, f2b_1.part])
